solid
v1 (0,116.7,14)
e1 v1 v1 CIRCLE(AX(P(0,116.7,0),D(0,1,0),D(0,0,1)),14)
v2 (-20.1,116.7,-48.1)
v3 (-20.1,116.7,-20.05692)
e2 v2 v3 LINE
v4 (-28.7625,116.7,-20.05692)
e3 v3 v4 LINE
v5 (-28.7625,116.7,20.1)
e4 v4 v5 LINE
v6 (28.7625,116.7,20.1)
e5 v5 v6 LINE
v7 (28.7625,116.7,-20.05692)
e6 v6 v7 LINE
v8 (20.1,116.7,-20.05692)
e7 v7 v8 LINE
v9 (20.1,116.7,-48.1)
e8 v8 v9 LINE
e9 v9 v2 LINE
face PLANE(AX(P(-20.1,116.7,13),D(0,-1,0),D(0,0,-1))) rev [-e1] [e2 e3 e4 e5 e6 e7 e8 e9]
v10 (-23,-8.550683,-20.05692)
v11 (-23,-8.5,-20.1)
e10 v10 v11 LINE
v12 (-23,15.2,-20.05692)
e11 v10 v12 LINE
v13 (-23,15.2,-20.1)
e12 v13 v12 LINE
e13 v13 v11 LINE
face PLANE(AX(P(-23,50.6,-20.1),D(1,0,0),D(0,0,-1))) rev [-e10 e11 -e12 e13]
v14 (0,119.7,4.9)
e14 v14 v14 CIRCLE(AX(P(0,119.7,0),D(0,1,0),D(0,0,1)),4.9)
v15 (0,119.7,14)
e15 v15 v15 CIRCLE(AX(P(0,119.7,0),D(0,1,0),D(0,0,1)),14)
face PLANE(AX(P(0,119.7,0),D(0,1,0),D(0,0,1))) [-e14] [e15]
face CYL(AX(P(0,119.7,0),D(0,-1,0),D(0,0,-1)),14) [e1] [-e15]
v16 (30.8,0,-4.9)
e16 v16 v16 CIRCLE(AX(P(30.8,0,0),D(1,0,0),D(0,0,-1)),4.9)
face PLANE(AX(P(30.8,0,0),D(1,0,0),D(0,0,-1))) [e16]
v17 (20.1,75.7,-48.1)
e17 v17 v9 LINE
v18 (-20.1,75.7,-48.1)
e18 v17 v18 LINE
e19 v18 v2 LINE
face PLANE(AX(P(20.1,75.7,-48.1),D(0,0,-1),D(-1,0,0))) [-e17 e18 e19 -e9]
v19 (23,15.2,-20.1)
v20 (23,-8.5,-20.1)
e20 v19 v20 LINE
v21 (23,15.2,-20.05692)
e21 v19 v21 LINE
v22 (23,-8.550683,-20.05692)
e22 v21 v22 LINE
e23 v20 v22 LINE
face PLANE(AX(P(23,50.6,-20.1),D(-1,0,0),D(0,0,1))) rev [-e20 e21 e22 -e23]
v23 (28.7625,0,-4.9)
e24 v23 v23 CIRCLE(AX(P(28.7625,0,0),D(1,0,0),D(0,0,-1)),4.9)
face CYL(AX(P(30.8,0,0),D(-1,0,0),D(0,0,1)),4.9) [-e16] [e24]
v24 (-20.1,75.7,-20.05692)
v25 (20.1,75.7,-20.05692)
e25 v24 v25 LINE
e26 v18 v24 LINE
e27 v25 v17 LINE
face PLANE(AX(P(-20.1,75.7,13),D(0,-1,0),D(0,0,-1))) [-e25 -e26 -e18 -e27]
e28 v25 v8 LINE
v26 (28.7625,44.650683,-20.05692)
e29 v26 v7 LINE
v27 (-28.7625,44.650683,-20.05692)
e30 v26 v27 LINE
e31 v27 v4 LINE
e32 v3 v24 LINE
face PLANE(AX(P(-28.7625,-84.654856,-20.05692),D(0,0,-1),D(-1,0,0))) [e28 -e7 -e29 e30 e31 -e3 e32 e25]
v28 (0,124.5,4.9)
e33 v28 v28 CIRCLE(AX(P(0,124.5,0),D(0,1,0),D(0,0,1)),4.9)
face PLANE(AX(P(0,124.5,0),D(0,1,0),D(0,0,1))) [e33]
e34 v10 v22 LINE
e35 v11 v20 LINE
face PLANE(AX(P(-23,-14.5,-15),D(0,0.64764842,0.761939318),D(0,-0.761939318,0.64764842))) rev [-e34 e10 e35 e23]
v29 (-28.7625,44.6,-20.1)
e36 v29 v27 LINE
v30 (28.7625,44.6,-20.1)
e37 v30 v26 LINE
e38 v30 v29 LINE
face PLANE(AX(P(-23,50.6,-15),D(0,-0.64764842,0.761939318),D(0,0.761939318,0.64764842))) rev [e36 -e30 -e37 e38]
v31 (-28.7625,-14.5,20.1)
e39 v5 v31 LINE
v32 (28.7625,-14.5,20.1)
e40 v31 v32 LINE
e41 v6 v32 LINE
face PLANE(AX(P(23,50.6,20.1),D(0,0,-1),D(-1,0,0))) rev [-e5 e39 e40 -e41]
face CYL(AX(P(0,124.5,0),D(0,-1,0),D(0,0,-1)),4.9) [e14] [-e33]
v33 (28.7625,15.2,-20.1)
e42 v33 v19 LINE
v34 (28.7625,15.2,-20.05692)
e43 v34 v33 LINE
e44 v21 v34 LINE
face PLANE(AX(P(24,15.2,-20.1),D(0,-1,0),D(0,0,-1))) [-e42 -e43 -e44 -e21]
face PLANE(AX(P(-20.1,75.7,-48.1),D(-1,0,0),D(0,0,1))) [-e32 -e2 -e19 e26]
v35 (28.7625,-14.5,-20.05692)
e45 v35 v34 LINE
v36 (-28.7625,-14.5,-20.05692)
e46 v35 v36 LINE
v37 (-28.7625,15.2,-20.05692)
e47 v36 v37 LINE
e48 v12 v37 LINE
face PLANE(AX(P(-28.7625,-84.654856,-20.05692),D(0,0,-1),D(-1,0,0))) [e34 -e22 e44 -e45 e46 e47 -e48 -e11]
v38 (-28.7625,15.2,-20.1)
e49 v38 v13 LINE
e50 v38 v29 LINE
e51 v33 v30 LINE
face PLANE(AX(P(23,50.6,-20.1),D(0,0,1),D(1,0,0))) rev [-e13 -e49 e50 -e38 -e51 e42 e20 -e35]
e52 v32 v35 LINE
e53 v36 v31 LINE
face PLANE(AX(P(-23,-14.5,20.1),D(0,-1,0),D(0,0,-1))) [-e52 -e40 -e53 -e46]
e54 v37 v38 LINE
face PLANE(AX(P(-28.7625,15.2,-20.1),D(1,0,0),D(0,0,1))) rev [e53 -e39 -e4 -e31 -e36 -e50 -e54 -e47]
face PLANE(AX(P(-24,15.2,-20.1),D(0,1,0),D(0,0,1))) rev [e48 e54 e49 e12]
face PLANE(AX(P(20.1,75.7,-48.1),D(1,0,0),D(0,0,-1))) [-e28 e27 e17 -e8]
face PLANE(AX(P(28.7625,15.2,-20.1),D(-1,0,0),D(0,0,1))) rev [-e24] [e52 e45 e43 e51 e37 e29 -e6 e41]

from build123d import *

# Parameters (mm, degrees)
SKETCH1_W                 = 46
SKETCH1_H                 = 40.2
BOSS_EXTRUDE1_DEPTH       = 65.1
SKETCH3_R                 = 14
BOSS_EXTRUDE2_DEPTH       = 3
SKETCH4_R                 = 4.9
BOSS_EXTRUDE3_DEPTH       = 4.8
SKETCH7_W                 = 40.2
SKETCH7_H                 = 35.4
BOSS_EXTRUDE6_DEPTH       = 1
CHAMFER1_SIZE             = 6
CHAMFER1_SIZE2            = 5.1
MIRROR3_START             = 44.200099823
MIRROR3_OUTLINE_W         = 50
MIRROR3_OUTLINE_H         = 11
MIRROR3_DEPTH             = 3.885890521
CHAMFER1_OF_MIRROR8_SIZE2 = 5.1
CHAMFER1_OF_MIRROR8_SIZE  = 6
BOSS_EXTRUDE7_DEPTH       = 4.7625
SKETCH9_W                 = 40.2
SKETCH9_H                 = 61.1
BOSS_EXTRUDE8_DEPTH       = 41
SKETCH10_W                = 38
SKETCH10_H                = 38
BOSS_EXTRUDE9_DEPTH       = 9.3
SKETCH11_R                = 14
BOSS_EXTRUDE10_DEPTH      = 3
SKETCH12_R                = 4.9
BOSS_EXTRUDE11_DEPTH      = 4.8
BOSS_EXTRUDE12_REACH      = 145.093
SKETCH13_W                = 57.525
SKETCH13_H                = 40.156919592


# Read off the part's stored shape, not the designer's step: Mirror3
with BuildPart() as part:
    # Sketch1 → Boss-Extrude1 (new body)
    with BuildSketch(Plane(origin=(0, -14.5, 0), x_dir=(-1, 0, 0), z_dir=(0, 1, 0))):
        Rectangle(SKETCH1_W, SKETCH1_H)
    extrude(amount=BOSS_EXTRUDE1_DEPTH)

    # Sketch3 → Boss-Extrude2 (add)
    with BuildSketch(Plane.ZY.offset(-23)):
        Circle(SKETCH3_R)
    extrude(amount=-BOSS_EXTRUDE2_DEPTH)

    # Sketch4 → Boss-Extrude3 (add)
    with BuildSketch(Plane(origin=(26, 0, 0), x_dir=(0, 0, -1), z_dir=(1, 0, 0))):
        with Locations(Location((0, 0, 0), (0, 0, 180))):
            Circle(SKETCH4_R)
    extrude(amount=BOSS_EXTRUDE3_DEPTH)

    # Sketch7 → Boss-Extrude6 (add)
    with BuildSketch(Plane.ZY.offset(23)):
        with Locations((0, 32.9)):
            Rectangle(SKETCH7_W, SKETCH7_H)
    boss_extrude6 = extrude(amount=BOSS_EXTRUDE6_DEPTH)

    # Mirror1: Boss-Extrude6 across plane
    add(boss_extrude6.mirror(Plane(origin=(0, 0, 0), x_dir=(0, 0, 1), z_dir=(1, 0, 0))))

    # Chamfer1
    chamfer1_edges = [part.edges().sort_by_distance(p)[0] for p in [
        (0, 50.6, 20.1),
    ]]
    chamfer1_side = [part.faces().sort_by_distance(p)[0] for p in [
        (0, 18.392982971, 20.1),
    ]]
    chamfer(chamfer1_edges, length=CHAMFER1_SIZE, length2=CHAMFER1_SIZE2, reference=chamfer1_side[0])

    # Mirror3 outline → Mirror3 (cut)
    with BuildSketch(Plane(origin=(0, 0, 0), x_dir=(1, 0, 0), z_dir=(0, 0.6476484200955404, -0.7619393177594594)).offset(MIRROR3_START)):
        with Locations((0, -24.5)):
            Rectangle(MIRROR3_OUTLINE_W, MIRROR3_OUTLINE_H)
    mirror3 = extrude(amount=MIRROR3_DEPTH, mode=Mode.SUBTRACT)

    # Mirror8: Mirror3 across plane
    add(mirror3.mirror(Plane.ZX.offset(18.05)), mode=Mode.SUBTRACT)

    # Chamfer1 of Mirror8
    chamfer1_of_mirror8_edges = [part.edges().sort_by_distance(p)[0] for p in [
        (0, -14.5, 20.1),
    ]]
    chamfer(chamfer1_of_mirror8_edges, length=CHAMFER1_OF_MIRROR8_SIZE, length2=CHAMFER1_OF_MIRROR8_SIZE2)

    # Sketch8 → Boss-Extrude7 (add)
    with BuildSketch(Plane(origin=(24, 0, 0), x_dir=(0, 0, -1), z_dir=(1, 0, 0))):
        Polygon((20.1, 15.2), (8.9, 15.2), (-20.1, 31.2), (-20.1, 115.2), (8.9, 115.2), (8.9, 57.776470588), (20.1, 44.6), align=None)
    boss_extrude7 = extrude(amount=BOSS_EXTRUDE7_DEPTH)

    # Mirror4: Boss-Extrude7 across plane
    add(boss_extrude7.mirror(Plane(origin=(0, 0, 0), x_dir=(0, 0, 1), z_dir=(1, 0, 0))))



with BuildPart() as body_2:
    # Sketch9 → Boss-Extrude8 (new body)
    with BuildSketch(Plane(origin=(0, 116.7, 0), x_dir=(-1, 0, 0), z_dir=(0, 1, 0))):
        with Locations((0, -17.55)):
            Rectangle(SKETCH9_W, SKETCH9_H)
    extrude(amount=-BOSS_EXTRUDE8_DEPTH)


with BuildPart() as part_1:
    add(part.part)

    add(body_2.part)  # Boss-Extrude9 merges body 2
    # Sketch10 → Boss-Extrude9 (add)
    with BuildSketch(Plane.ZY.offset(-24)):
        with Locations((1.1, 96.2)):
            Rectangle(SKETCH10_W, SKETCH10_H)
    boss_extrude9 = extrude(amount=BOSS_EXTRUDE9_DEPTH)

    # Mirror6: Boss-Extrude9 across plane
    add(boss_extrude9.mirror(Plane(origin=(0, 0, 0), x_dir=(0, 0, 1), z_dir=(1, 0, 0))))

    # Sketch11 → Boss-Extrude10 (add)
    with BuildSketch(Plane(origin=(0, 116.7, 0), x_dir=(-1, 0, 0), z_dir=(0, 1, 0))):
        with Locations(Location((0, 0, 0), (0, 0, 68.213210702))):
            Circle(SKETCH11_R)
    extrude(amount=BOSS_EXTRUDE10_DEPTH)

    # Sketch12 → Boss-Extrude11 (add)
    with BuildSketch(Plane(origin=(0, 119.7, 0), x_dir=(1, 0, 0), z_dir=(0, 1, 0))):
        with Locations(Location((0, 0, 0), (0, 0, 270))):
            Circle(SKETCH12_R)
    extrude(amount=BOSS_EXTRUDE11_DEPTH)

    # Boss-Extrude12: up to this face of the body (flat: up to its plane)
    boss_extrude12_end = Plane(part_1.part.faces().sort_by_distance((0, -14.5, 0))[0])
    # Sketch13 → Boss-Extrude12 (add, up to the picked face)
    with BuildSketch(Plane(origin=(0, 116.7, 0), x_dir=(1, 0, 0), z_dir=(0, 1, 0)), mode=Mode.PRIVATE) as boss_extrude12_sk1:
        with Locations((0, -0.021540204)):
            Rectangle(SKETCH13_W, SKETCH13_H)
    boss_extrude12_tool1 = split(extrude(boss_extrude12_sk1.sketch, amount=-BOSS_EXTRUDE12_REACH, mode=Mode.PRIVATE), bisect_by=boss_extrude12_end, keep=Keep.BOTH, mode=Mode.PRIVATE)
    add(boss_extrude12_tool1.solids().sort_by(Axis((0, 116.7, 0.02154), (0, -1, 0)))[0])


solid = part_1.part
